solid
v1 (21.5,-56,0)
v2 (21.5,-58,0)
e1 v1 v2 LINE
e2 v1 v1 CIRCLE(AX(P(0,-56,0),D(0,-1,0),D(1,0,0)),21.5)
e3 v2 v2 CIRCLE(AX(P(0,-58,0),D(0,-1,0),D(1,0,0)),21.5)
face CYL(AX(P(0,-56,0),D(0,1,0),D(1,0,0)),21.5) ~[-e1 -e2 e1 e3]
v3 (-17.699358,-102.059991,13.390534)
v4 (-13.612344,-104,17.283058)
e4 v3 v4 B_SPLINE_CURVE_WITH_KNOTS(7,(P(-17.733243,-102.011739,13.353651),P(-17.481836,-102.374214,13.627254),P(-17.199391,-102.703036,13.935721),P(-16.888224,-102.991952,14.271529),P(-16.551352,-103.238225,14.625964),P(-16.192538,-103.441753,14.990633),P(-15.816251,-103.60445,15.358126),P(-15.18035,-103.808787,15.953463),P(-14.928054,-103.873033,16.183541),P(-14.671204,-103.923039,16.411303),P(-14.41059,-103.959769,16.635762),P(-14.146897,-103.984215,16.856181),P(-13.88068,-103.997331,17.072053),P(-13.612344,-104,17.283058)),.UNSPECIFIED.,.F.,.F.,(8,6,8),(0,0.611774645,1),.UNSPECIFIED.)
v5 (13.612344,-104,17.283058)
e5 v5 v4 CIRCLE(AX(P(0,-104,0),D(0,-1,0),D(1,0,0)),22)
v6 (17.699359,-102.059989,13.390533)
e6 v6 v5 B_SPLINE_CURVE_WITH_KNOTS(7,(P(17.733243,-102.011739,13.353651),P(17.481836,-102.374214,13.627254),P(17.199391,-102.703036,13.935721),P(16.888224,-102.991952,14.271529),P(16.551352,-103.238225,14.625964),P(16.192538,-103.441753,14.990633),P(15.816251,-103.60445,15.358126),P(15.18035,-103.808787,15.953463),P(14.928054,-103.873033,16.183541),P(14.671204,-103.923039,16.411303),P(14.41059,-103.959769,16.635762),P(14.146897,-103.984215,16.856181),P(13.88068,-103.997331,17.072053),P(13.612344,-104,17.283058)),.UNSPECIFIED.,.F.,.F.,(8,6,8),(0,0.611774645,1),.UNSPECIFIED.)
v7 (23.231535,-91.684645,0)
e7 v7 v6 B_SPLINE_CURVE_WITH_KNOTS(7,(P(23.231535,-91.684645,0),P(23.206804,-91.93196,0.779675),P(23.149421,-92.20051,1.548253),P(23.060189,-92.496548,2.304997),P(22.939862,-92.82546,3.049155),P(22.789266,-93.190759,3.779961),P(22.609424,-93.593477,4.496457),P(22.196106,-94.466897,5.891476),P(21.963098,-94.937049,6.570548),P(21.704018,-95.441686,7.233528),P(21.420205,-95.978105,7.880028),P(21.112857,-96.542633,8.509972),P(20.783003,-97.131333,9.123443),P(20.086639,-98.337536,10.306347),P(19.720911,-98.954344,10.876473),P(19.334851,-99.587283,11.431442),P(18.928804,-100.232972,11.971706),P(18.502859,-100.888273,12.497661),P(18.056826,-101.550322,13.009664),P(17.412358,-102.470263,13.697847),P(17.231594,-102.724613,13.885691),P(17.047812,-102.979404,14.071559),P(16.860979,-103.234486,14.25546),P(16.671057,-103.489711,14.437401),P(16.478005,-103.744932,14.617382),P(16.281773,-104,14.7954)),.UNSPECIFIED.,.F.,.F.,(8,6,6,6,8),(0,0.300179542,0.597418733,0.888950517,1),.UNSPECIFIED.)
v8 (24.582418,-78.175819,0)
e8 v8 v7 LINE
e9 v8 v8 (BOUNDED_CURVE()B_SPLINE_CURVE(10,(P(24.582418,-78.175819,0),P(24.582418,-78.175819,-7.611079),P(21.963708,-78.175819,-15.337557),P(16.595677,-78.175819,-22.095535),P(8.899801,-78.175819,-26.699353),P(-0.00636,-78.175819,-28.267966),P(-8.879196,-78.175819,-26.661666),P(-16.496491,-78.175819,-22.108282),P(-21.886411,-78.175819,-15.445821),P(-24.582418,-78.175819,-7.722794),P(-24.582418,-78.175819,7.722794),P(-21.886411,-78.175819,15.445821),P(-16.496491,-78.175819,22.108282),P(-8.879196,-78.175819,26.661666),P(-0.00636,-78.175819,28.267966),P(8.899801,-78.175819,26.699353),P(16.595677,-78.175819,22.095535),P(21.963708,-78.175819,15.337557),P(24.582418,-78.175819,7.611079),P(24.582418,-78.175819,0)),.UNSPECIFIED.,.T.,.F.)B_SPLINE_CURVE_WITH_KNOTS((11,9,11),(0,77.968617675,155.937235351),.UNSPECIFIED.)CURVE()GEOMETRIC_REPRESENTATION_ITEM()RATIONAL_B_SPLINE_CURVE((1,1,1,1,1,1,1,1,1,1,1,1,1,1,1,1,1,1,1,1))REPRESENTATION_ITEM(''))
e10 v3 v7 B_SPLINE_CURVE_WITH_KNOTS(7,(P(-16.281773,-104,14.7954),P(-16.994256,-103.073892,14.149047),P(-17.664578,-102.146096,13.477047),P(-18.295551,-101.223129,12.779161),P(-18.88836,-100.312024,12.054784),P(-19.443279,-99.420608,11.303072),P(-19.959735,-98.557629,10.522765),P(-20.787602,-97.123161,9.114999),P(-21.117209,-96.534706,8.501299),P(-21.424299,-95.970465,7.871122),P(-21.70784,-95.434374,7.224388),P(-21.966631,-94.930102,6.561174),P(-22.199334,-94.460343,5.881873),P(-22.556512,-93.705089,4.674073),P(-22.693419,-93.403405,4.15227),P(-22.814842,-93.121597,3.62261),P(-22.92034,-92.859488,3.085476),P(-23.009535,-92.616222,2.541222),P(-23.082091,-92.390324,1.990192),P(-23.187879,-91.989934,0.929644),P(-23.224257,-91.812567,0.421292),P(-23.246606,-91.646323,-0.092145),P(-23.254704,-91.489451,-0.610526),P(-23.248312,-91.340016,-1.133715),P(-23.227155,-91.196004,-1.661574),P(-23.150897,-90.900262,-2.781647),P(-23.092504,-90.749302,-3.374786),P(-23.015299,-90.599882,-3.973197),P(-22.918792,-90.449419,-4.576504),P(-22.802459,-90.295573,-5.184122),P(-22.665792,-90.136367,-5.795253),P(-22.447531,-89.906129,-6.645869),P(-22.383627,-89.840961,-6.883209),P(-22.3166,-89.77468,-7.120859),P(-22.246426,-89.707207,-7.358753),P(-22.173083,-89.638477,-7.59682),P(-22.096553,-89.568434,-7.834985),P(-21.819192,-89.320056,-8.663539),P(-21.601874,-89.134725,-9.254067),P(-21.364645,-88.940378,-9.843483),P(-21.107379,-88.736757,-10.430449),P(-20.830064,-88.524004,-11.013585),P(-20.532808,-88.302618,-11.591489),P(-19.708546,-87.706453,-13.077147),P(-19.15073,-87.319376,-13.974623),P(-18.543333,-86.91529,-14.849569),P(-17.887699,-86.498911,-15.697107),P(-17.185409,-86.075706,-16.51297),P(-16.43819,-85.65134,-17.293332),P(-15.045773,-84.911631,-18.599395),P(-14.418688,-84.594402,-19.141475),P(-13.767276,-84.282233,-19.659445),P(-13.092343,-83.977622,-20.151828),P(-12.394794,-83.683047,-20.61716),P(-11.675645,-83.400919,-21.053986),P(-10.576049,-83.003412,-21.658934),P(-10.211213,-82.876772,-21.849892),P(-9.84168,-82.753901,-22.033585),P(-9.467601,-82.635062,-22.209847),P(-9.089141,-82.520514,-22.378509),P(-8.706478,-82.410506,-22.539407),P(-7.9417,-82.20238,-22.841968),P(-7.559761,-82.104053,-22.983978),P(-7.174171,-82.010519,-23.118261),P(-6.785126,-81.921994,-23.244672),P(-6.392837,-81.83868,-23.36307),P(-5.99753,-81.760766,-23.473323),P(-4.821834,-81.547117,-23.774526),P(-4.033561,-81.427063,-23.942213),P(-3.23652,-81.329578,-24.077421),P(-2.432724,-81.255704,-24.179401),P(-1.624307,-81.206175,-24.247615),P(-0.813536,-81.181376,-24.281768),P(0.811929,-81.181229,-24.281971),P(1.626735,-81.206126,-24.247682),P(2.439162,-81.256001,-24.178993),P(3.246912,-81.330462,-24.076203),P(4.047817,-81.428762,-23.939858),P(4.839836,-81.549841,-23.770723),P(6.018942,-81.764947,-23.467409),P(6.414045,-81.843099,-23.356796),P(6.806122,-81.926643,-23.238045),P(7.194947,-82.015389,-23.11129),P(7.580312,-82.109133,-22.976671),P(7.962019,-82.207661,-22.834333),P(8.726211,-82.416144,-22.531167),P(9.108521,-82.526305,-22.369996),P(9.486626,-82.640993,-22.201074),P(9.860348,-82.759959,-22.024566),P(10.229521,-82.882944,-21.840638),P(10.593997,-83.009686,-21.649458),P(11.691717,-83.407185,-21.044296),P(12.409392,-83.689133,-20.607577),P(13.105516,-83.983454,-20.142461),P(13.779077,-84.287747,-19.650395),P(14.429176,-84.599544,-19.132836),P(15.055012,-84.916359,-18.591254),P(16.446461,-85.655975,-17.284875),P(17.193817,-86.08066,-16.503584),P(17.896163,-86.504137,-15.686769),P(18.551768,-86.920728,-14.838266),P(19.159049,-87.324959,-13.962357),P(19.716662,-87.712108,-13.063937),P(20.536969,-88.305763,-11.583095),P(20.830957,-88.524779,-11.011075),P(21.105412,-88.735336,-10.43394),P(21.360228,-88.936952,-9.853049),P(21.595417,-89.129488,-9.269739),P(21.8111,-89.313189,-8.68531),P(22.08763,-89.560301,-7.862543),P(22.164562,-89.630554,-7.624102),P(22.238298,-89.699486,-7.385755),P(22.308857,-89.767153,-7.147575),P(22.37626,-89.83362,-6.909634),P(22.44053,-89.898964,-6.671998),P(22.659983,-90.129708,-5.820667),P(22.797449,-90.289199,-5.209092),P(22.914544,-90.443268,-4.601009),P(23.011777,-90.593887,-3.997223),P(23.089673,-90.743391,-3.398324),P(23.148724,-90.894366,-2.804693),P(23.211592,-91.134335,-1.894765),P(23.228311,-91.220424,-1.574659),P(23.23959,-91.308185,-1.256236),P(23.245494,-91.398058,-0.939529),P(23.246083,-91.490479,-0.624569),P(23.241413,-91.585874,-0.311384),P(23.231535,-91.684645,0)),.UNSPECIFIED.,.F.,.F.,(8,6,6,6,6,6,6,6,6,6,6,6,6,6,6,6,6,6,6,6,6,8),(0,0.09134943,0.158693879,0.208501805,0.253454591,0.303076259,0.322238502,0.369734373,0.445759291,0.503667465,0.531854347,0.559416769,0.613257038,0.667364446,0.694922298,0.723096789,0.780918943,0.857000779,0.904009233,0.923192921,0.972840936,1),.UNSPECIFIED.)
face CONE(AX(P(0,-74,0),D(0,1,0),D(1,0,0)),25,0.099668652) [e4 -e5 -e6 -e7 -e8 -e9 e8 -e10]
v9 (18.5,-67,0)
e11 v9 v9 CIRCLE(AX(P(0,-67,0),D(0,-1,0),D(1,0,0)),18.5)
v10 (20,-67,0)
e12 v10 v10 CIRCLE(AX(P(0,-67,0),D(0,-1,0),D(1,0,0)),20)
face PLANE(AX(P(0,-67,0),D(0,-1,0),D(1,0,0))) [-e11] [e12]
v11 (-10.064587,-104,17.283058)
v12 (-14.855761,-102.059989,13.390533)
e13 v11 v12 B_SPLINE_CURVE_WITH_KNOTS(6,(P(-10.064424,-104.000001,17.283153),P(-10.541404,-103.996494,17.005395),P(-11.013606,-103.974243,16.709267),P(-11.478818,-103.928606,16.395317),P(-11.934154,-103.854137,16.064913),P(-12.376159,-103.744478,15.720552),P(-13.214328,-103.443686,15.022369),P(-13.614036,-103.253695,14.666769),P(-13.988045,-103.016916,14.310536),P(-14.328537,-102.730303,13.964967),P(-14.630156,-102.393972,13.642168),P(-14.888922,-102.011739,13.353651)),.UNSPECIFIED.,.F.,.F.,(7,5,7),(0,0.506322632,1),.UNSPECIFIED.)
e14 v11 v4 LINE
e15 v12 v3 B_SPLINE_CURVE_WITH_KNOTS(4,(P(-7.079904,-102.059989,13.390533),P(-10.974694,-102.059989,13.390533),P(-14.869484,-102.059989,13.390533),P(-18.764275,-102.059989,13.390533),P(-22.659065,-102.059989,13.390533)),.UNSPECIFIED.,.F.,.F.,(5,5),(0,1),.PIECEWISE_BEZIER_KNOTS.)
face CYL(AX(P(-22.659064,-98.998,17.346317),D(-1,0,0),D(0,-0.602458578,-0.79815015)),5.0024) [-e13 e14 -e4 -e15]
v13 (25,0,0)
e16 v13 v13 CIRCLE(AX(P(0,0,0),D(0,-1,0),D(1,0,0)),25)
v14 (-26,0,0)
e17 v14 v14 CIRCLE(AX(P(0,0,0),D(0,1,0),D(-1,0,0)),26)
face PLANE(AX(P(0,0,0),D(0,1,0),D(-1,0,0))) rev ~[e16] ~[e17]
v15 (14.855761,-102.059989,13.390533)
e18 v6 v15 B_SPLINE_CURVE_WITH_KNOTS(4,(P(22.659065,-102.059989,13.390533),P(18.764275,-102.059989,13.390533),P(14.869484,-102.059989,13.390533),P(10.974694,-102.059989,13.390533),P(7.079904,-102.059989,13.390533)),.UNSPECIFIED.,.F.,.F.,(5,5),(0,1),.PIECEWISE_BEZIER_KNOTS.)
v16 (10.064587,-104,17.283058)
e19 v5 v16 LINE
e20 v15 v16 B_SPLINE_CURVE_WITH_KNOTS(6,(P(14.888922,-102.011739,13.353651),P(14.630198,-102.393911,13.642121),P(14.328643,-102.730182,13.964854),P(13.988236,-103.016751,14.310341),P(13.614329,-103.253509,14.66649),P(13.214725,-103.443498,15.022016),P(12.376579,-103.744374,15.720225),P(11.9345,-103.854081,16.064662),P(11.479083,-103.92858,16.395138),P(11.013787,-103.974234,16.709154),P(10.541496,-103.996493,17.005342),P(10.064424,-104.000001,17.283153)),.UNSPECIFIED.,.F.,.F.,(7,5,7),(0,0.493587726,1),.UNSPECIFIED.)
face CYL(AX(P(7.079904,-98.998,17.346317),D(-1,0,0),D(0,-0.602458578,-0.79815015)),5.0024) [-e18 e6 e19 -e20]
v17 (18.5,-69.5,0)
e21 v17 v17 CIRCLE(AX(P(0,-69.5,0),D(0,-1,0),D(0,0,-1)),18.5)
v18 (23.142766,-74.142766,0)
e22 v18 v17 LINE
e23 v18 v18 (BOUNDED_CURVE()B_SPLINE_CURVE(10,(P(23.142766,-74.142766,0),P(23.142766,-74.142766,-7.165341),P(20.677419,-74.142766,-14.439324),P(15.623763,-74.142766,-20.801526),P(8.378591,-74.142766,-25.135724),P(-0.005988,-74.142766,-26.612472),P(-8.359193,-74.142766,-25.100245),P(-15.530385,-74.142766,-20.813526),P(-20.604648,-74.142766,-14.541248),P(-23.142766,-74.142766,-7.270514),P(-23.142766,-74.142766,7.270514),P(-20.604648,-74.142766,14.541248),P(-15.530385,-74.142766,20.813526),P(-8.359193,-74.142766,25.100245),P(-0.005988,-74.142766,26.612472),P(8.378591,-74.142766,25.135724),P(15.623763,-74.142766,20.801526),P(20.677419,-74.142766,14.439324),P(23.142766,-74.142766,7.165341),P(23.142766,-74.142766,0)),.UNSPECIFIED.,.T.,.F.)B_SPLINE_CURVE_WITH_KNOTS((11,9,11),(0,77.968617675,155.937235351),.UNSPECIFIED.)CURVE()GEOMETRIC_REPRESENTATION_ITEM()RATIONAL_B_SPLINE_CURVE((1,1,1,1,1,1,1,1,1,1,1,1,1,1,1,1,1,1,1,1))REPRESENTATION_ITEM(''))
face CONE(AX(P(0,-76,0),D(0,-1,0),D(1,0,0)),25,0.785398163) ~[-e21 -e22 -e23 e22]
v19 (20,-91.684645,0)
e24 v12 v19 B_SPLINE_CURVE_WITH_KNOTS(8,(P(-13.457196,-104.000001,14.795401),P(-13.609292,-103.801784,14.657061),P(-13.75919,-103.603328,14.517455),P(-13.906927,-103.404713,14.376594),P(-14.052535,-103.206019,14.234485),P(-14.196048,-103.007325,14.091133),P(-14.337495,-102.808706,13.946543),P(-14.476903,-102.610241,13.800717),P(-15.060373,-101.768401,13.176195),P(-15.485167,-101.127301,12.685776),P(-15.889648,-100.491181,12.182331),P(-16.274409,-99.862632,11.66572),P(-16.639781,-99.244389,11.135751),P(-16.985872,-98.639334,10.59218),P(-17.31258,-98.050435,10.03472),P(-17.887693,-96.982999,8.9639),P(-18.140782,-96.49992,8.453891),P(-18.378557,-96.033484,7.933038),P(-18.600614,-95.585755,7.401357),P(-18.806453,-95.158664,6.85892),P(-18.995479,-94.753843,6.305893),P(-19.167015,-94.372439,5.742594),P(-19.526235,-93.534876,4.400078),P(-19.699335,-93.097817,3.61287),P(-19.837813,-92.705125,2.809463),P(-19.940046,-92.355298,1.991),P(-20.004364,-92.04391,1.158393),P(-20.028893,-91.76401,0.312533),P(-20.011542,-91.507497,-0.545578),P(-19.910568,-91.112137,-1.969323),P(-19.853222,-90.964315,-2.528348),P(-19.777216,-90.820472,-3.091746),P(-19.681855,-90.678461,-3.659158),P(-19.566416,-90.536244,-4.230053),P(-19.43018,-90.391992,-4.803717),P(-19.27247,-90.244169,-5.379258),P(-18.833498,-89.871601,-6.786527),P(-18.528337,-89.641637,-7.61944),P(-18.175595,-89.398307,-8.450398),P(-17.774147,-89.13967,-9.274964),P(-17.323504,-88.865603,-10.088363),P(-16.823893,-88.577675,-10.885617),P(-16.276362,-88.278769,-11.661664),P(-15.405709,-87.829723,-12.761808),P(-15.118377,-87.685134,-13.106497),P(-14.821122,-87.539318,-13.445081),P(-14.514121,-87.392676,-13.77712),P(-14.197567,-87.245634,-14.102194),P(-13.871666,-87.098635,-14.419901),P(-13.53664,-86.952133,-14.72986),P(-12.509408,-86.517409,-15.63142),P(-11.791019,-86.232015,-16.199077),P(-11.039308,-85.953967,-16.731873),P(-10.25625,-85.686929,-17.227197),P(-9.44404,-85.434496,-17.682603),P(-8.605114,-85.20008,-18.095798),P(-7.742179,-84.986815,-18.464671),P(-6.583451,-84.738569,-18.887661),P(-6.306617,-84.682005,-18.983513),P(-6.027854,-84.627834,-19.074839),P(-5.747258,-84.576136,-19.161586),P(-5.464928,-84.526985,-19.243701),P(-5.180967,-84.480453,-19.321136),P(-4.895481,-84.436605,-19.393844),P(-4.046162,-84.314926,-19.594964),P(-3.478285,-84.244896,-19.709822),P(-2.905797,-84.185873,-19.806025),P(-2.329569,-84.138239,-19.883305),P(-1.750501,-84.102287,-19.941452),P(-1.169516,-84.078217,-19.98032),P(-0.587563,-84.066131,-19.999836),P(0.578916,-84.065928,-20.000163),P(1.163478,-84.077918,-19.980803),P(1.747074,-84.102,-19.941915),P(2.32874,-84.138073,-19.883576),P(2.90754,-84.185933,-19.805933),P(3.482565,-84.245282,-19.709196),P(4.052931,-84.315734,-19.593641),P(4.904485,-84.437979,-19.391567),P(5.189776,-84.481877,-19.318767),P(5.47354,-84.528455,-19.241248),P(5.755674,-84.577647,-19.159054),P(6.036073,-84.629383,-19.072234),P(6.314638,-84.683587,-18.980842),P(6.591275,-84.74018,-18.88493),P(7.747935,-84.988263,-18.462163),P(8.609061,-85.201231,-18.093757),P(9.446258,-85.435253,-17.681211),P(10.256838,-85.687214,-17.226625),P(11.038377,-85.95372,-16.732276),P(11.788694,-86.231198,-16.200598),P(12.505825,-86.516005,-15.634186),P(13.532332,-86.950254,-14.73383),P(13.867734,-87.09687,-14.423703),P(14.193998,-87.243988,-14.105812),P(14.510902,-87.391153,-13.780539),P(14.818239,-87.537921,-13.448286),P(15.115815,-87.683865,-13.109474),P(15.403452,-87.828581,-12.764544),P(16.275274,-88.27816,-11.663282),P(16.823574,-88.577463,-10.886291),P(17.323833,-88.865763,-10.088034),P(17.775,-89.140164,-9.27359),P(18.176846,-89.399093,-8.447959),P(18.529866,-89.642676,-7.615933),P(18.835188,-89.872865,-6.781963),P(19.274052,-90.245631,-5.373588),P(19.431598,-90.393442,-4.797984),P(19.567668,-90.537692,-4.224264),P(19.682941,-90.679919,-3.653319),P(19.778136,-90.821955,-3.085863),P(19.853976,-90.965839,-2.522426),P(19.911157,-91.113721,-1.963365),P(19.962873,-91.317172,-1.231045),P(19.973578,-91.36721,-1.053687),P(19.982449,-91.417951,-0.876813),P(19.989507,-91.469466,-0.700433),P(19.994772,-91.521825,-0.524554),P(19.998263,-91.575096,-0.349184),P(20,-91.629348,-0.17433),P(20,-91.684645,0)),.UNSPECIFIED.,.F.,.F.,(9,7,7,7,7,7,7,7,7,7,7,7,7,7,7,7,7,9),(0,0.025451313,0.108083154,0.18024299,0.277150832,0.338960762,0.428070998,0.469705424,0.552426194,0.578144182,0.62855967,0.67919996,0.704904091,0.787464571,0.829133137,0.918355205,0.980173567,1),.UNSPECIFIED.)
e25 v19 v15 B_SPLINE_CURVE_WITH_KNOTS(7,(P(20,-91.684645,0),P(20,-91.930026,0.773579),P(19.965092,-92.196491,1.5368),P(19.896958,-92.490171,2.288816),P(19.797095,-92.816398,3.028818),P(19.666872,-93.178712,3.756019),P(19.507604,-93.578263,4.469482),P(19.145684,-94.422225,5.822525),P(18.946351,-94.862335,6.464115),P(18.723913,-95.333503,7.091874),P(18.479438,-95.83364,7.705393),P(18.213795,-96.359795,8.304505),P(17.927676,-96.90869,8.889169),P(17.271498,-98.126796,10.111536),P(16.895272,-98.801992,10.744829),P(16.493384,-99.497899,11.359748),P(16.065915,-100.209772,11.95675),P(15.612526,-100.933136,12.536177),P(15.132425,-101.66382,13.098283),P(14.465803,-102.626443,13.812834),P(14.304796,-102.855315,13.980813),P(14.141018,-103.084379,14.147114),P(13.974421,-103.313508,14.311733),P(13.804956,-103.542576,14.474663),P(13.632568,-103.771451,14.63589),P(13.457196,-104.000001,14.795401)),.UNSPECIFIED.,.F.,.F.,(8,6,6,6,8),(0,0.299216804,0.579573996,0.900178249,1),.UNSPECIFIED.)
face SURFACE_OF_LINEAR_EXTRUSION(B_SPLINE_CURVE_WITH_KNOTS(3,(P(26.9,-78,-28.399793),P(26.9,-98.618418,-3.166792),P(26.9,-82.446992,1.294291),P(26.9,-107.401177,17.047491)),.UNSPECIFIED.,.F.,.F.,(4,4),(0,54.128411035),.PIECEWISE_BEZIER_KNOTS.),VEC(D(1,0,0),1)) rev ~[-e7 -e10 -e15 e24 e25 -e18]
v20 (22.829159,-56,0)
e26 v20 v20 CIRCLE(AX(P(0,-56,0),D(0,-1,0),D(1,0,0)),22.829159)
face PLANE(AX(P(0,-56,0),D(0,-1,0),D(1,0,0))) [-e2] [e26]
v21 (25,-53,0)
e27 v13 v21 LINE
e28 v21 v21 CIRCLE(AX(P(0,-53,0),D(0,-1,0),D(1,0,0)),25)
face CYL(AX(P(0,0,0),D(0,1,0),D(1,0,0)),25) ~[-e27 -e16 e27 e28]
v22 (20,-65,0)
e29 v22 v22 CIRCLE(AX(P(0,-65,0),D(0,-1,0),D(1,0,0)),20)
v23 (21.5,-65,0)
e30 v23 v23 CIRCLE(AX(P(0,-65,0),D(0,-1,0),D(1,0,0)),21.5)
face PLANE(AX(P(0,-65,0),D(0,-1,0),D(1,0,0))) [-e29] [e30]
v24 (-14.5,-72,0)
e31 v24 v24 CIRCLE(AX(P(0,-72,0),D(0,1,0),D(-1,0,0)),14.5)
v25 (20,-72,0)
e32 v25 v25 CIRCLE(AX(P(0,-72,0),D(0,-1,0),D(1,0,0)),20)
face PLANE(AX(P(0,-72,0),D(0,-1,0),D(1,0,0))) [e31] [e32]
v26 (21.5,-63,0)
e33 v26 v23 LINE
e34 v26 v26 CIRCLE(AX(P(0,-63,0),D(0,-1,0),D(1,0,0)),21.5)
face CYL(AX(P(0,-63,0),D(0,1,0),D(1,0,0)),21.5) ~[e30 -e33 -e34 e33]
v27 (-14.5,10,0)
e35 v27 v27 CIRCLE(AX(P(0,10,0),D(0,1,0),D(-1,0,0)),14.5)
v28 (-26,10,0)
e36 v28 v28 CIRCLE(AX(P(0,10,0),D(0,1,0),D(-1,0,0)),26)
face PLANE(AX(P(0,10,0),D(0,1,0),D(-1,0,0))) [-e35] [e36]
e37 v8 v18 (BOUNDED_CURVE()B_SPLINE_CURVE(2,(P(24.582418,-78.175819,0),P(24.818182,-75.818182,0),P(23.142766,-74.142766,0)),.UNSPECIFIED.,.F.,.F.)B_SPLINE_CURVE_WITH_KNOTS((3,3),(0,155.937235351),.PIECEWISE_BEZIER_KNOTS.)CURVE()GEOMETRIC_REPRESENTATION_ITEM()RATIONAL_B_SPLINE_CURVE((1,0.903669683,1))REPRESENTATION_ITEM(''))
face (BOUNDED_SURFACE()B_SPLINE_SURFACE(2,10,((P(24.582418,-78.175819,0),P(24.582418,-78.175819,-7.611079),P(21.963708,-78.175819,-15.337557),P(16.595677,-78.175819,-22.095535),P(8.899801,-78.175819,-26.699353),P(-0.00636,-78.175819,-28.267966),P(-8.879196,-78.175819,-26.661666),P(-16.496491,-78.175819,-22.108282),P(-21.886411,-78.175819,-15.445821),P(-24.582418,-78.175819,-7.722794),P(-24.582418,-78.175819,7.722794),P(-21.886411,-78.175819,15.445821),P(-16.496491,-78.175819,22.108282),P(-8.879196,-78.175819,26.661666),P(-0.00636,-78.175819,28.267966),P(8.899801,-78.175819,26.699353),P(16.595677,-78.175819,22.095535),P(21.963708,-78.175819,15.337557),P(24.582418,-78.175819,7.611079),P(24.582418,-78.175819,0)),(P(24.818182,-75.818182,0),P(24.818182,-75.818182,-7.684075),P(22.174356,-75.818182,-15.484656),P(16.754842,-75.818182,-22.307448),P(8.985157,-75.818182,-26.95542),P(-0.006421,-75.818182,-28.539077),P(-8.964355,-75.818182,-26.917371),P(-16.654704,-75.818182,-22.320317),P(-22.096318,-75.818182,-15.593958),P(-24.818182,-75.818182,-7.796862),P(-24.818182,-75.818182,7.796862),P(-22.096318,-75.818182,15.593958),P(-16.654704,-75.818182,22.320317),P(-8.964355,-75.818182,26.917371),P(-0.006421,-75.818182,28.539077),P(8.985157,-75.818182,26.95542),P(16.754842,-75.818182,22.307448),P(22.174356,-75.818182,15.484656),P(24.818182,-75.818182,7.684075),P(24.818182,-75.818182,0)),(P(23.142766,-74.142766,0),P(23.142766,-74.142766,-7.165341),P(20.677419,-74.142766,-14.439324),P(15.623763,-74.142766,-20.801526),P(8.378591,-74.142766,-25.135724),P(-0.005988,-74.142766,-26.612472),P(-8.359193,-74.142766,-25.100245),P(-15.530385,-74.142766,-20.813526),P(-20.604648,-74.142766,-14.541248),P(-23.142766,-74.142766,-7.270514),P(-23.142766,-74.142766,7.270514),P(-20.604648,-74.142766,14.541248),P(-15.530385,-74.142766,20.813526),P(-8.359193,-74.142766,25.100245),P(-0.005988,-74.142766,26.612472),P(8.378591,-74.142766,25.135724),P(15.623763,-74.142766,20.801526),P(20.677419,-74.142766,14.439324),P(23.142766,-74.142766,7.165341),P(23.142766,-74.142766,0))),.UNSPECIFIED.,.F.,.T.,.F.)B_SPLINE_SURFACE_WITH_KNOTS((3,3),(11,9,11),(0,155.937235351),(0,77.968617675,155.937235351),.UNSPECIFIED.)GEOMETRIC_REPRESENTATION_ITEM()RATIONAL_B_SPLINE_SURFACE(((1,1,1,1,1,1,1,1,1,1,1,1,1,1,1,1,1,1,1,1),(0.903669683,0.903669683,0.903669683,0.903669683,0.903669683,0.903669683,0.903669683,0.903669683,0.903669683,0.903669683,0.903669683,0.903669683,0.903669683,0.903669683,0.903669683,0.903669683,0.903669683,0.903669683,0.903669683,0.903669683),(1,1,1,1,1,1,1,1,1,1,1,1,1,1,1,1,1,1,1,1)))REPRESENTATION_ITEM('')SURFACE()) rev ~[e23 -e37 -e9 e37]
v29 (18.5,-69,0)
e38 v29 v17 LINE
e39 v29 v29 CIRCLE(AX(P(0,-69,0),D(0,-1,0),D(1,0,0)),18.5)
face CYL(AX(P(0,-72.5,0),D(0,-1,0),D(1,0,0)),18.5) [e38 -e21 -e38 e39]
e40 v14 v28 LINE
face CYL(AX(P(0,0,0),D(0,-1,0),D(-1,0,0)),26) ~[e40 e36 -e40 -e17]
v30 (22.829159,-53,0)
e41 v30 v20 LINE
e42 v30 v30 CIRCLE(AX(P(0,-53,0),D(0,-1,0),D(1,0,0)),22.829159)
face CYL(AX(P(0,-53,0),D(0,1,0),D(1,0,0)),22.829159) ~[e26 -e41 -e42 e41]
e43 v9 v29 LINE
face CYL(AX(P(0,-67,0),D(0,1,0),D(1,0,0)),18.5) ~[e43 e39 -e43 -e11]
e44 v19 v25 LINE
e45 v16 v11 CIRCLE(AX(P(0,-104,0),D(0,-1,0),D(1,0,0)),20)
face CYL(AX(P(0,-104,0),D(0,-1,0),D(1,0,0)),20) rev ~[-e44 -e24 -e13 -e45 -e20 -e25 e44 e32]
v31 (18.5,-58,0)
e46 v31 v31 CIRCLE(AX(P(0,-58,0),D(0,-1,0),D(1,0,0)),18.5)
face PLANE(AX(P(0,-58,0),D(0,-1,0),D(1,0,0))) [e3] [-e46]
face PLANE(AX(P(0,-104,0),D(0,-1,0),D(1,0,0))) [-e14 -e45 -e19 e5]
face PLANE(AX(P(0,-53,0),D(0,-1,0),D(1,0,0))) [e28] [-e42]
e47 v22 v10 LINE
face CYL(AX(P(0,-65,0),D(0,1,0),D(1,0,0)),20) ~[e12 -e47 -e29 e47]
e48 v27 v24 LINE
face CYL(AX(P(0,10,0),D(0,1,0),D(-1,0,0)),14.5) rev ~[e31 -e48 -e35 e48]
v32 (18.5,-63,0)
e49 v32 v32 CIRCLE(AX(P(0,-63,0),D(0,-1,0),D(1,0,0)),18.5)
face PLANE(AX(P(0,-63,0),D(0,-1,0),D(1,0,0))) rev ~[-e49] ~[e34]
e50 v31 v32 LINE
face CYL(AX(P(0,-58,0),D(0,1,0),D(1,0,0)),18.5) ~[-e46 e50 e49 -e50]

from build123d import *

# Parameters (mm, degrees)
F0_R         = 25
F1_DEPTH     = 53
F2_R         = 26
F3_DEPTH     = 10
F4_R         = 22.8291590373
F5_DEPTH     = 3
F6_R         = 21.5
F7_DEPTH     = 2
F8_R         = 18.5
F9_DEPTH     = 5
F10_R        = 21.5
F11_DEPTH    = 2
F12_R        = 20
F13_DEPTH    = 2
F14_R        = 18.5
F15_DEPTH    = 2
F16_R        = 25
F17_DEPTH    = 35
F18_R        = 20
F19_DEPTH    = 32
F20_S5_R     = 18.5
F20_T6_DEPTH = 37
F22_R        = 5
F25_DEPTH    = 52.3
F26_T1_DEPTH = 15.5791600382
F26_T3_DEPTH = 15.5791600382
F27_R        = 14.5
F28_DEPTH    = 128


# Not quite as in the source:
# - a fillet or chamfer that OpenCascade refuses, or shapes differently, is made with other operations: its cross-section is extruded or revolved along the edge and cut away or added


with BuildPart() as f1:
    # F0 (on Front) → F1 (new body)
    with BuildSketch(Plane.XZ):
        Circle(F0_R)
    extrude(amount=F1_DEPTH)

    # F2 (on face) → F3 (join)
    with BuildSketch(Plane(origin=(0, 0, 0), x_dir=(-1, 0, 0), z_dir=(0, 1, 0))):
        Circle(F2_R)
    extrude(amount=F3_DEPTH)

    # F4 (on face) → F5 (join)
    with BuildSketch(Plane.XZ.offset(53)):
        Circle(F4_R)
    extrude(amount=F5_DEPTH)

    # F6 (on face) → F7 (join)
    with BuildSketch(Plane.XZ.offset(56)):
        Circle(F6_R)
    extrude(amount=F7_DEPTH)

    # F8 (on face) → F9 (join)
    with BuildSketch(Plane.XZ.offset(58)):
        Circle(F8_R)
    extrude(amount=F9_DEPTH)

    # F10 (on face) → F11 (join)
    with BuildSketch(Plane.XZ.offset(63)):
        Circle(F10_R)
    extrude(amount=F11_DEPTH)

    # F12 (on face) → F13 (join)
    with BuildSketch(Plane.XZ.offset(65)):
        Circle(F12_R)
    extrude(amount=F13_DEPTH)

    # F14 (on face) → F15 (join)
    with BuildSketch(Plane.XZ.offset(67)):
        Circle(F14_R)
    extrude(amount=F15_DEPTH)

    # F16 (on face) → F17 (join)
    with BuildSketch(Plane.XZ.offset(69)):
        Circle(F16_R)
    extrude(amount=F17_DEPTH)

    # F18 (on face) → F19 (cut)
    with BuildSketch(Plane.XZ.offset(104)):
        Circle(F18_R)
    extrude(amount=-F19_DEPTH, mode=Mode.SUBTRACT)

    # F20: chamfer of 7 on 1 edges, made by hand


with BuildPart() as f20_tool2:
    # F20_s3 → F20_t4 (revolve)
    with BuildSketch(Plane.XY):
        Polygon((25, -76), (18, -69), (25, -69), align=None)
    revolve(axis=Axis((0, -69, 0), (0, -1, 0)))

    # F20_s5 → F20_t6 (cut, symmetric)
    with BuildSketch(Plane.XZ.offset(72.5)):
        Circle(F20_S5_R)
    extrude(amount=F20_T6_DEPTH, both=True, mode=Mode.SUBTRACT)


with BuildPart() as f1_1:
    add(f1.part)

    # F20_t1: cut F20_tool2
    add(f20_tool2.part, mode=Mode.SUBTRACT)

    # F21: chamfer of 3 x 30 on 1 edges, made by hand

    # F21_s1 → F21_t2 (revolve, cut)
    with BuildSketch(Plane.XY):
        Polygon((25, -74), (22, -104), (25, -104), align=None)
    revolve(axis=Axis((0, -104, 0), (0, -1, 0)), mode=Mode.SUBTRACT)

    # F22
    f22_edges = [f1_1.edges().sort_by_distance(p)[0] for p in [
        (-24.818182, -75.818182, 0),
    ]]
    fillet(f22_edges, radius=F22_R)

    # F24 (on offset) → F25 (cut)
    with BuildSketch(Plane.YZ.offset(26.9)):
        with BuildLine():
            Line((-78, -31.0485586524), (-78, -28.3997934312))
            add(Edge.make_bspline(
                [(-78, -28.3997934312), (-98.6184179783, -3.1667915173), (-82.4469923973, 1.2942913454), (-107.4011772871, 17.0474909246)],
                knots=[0, 0, 0, 0, 54.1284110351, 54.1284110351, 54.1284110351, 54.1284110351], degree=3))
            Line((-107.4011772871, 17.0474909246), (-107.4011772871, -31.0485586524))
            Line((-107.4011772871, -31.0485586524), (-78, -31.0485586524))
        make_face()
    extrude(amount=-F25_DEPTH, mode=Mode.SUBTRACT)

    # F26: fillet of radius 5 on 2 edges, made by hand

    # F26_s2 → F26_t1 (cut)
    with BuildSketch(Plane.YZ.offset(7.0799043749)):
        with BuildLine():
            ThreePointArc((-102.0117387885, 13.3536507945), (-103.4757188766, 15.1160616448), (-104.0004, 17.346317106))
            Line((-104.0004, 17.346317106), (-104.50064, 17.346317106))
            ThreePointArc((-104.50064, 17.346317106), (-104.50024, 16.0708587935), (-104.50024, 14.795400481))
            Line((-104.50024, 14.795400481), (-104.286297169, 14.3851883546))
            ThreePointArc((-104.286297169, 14.3851883546), (-103.2925012303, 13.6788063197), (-102.3131126673, 12.9543841634))
            Line((-102.3131126673, 12.9543841634), (-102.0117387885, 13.3536507945))
        make_face()
    extrude(amount=F26_T1_DEPTH, mode=Mode.SUBTRACT)

    # F26_s4 → F26_t3 (cut)
    with BuildSketch(Plane.YZ.offset(-22.6590644131)):
        with BuildLine():
            ThreePointArc((-102.0117387885, 13.3536507945), (-103.4757188766, 15.1160616448), (-104.0004, 17.346317106))
            Line((-104.0004, 17.346317106), (-104.50064, 17.346317106))
            ThreePointArc((-104.50064, 17.346317106), (-104.50024, 16.0708587935), (-104.50024, 14.795400481))
            Line((-104.50024, 14.795400481), (-104.286297169, 14.3851883546))
            ThreePointArc((-104.286297169, 14.3851883546), (-103.2925012303, 13.6788063197), (-102.3131126673, 12.9543841634))
            Line((-102.3131126673, 12.9543841634), (-102.0117387885, 13.3536507945))
        make_face()
    extrude(amount=F26_T3_DEPTH, mode=Mode.SUBTRACT)

    # F27 (on face) → F28 (cut)
    with BuildSketch(Plane(origin=(0, 10, 0), x_dir=(-1, 0, 0), z_dir=(0, 1, 0))):
        Circle(F27_R)
    extrude(amount=-F28_DEPTH, mode=Mode.SUBTRACT)


solid = f1_1.part
